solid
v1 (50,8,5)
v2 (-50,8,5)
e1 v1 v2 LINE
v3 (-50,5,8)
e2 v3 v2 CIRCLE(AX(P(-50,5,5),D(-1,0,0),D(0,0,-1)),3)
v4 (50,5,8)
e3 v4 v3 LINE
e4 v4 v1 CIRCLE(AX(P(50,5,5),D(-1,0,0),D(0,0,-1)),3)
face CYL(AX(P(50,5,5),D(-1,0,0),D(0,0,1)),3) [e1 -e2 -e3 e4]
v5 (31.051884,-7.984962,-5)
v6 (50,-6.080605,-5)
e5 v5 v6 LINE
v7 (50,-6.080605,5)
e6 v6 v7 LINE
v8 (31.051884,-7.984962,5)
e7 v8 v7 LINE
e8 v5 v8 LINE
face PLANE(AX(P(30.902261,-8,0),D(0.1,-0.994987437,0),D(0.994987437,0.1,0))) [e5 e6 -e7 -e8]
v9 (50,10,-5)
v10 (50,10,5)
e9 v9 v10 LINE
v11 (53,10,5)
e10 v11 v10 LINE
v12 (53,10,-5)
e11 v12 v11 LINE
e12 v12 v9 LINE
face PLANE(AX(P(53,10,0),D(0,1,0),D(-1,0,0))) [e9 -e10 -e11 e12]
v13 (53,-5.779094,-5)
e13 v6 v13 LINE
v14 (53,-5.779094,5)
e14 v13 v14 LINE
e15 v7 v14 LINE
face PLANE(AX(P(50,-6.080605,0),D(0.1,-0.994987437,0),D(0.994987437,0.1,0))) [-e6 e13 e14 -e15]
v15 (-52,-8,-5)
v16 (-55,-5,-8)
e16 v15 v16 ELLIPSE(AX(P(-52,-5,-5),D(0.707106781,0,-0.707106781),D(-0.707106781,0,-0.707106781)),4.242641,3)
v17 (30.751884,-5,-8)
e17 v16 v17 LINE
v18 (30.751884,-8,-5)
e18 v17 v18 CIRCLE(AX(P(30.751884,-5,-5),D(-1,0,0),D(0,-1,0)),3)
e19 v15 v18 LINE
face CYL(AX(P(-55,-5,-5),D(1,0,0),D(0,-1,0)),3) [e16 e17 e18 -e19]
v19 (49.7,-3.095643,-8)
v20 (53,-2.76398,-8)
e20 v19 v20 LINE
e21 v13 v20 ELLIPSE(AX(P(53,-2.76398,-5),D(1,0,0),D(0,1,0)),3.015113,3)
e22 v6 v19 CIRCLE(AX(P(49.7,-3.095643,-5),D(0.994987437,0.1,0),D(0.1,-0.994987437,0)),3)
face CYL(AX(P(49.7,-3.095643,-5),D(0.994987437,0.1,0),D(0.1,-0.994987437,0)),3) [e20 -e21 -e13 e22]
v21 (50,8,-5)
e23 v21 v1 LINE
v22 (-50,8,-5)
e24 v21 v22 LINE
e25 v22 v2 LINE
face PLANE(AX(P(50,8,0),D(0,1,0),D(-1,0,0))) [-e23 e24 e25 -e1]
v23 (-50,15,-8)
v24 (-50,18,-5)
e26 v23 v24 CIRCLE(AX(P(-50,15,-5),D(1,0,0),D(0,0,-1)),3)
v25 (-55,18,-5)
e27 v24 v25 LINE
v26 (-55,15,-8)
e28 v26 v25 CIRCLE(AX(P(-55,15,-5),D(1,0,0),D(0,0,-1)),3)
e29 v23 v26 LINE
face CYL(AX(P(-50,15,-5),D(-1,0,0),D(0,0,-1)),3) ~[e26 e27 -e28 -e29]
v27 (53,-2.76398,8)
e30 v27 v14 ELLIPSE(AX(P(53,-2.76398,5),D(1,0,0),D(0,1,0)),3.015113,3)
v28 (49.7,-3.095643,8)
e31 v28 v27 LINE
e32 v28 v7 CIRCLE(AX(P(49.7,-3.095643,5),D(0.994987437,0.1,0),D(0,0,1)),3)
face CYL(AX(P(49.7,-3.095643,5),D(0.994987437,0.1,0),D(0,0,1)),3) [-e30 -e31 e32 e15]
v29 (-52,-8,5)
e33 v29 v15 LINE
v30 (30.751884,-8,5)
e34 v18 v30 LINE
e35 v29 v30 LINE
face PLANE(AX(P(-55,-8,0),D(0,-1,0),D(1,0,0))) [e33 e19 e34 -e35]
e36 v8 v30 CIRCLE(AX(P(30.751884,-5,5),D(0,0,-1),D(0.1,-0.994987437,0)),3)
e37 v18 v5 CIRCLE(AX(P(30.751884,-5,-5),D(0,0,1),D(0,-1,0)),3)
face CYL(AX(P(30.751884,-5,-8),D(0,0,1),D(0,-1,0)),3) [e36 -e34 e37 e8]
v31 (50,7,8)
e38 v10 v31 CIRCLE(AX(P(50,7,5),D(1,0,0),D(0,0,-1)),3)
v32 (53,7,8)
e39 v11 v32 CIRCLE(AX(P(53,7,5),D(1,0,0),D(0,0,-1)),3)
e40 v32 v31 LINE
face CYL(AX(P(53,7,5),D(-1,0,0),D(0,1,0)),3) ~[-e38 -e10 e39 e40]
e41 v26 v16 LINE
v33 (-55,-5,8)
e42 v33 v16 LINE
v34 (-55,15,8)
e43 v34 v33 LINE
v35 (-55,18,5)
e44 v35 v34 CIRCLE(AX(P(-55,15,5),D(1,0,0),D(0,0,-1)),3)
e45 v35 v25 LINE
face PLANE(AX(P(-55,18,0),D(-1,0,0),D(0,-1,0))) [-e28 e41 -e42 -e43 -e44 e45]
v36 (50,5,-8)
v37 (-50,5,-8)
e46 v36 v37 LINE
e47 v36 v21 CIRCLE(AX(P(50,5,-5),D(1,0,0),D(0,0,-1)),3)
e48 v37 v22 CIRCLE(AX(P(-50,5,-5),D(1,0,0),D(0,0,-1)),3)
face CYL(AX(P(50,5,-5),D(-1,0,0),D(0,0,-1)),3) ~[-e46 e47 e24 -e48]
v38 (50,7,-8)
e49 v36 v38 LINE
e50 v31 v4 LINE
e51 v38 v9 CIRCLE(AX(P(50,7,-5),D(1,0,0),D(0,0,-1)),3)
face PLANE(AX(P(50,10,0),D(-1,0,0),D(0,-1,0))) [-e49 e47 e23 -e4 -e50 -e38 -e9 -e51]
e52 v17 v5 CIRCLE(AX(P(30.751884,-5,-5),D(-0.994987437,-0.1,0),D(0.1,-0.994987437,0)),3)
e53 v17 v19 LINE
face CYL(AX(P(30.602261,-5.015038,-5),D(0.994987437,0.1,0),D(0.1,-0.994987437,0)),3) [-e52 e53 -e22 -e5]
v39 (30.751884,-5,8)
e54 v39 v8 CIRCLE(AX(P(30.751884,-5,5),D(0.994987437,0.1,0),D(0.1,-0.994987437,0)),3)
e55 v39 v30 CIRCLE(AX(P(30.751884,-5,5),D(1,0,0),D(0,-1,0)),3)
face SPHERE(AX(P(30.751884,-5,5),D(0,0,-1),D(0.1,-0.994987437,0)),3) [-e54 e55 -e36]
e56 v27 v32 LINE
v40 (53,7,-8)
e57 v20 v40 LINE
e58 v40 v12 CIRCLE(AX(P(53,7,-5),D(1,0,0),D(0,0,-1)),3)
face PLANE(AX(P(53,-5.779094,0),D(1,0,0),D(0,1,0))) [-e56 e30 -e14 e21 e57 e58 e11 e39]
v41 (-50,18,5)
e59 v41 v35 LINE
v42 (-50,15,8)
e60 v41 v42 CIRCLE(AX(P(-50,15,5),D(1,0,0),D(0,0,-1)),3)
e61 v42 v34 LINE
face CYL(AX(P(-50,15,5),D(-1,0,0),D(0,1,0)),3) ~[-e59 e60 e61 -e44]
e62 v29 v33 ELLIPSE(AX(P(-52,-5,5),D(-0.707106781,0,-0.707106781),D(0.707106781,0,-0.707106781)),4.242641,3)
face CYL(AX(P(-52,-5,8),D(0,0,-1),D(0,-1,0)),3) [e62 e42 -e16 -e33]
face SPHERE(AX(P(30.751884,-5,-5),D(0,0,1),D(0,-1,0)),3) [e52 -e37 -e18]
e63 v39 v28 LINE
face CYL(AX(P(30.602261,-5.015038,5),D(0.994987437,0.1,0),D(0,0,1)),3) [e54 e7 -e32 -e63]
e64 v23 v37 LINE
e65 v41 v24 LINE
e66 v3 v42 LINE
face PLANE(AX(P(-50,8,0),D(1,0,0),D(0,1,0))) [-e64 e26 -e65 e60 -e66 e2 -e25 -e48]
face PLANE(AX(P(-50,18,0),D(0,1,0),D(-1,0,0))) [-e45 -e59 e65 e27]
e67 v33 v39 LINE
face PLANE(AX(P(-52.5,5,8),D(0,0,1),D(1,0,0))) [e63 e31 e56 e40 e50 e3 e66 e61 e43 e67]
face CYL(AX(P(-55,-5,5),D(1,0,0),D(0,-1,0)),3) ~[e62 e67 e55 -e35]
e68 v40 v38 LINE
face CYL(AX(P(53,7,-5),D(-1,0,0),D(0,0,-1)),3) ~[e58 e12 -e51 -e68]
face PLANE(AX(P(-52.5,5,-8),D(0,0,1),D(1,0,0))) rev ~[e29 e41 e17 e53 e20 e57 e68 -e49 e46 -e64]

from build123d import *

# Parameters (mm, degrees)
F2_DEPTH      = 8
F2_DEPTH_BACK = 8
F3_R          = 3


# Not quite as in the source:
# - two fillets or chamfers of one size are made in one step


with BuildPart() as f2:
    # F1 (on Top) → F2 (new body, two sides)
    with BuildSketch(Plane.XY) as f2_sk:
        Polygon((-55, -8), (-50, -8), (-50, 8), (-50, 18), (-55, 18), align=None)
        Polygon((-50, -8), (30.9022613208, -8), (50, -6.0806050441), (50, 8), (-50, 8), align=None)
        Polygon((50, 8), (50, -6.0806050441), (53, -5.7790936996), (53, 10), (50, 10), align=None)
    extrude(amount=F2_DEPTH)
    extrude(f2_sk.sketch, amount=-F2_DEPTH_BACK)

    # F3 (call 1 of 7: OpenCascade refuses the feature's edges together)
    f3_edges = [f2.edges().sort_by_distance(p)[0] for p in [
        (-12.048869, -8, 8),
        (-55, -8, 0),
        (30.902261, -8, 0),
        (-12.048869, -8, -8),
        (41.951131, -6.889547, 8),
        (41.951131, -6.889547, -8),
    ]]
    fillet(f3_edges, radius=F3_R)

    # F3#2 (call 2 of 7)
    f3_2_edges = [f2.edges().sort_by_distance(p)[0] for p in [
        (-52.5, 18, -8),
    ]]
    fillet(f3_2_edges, radius=F3_R)

    # F3#3 (call 3 of 7)
    f3_3_edges = [f2.edges().sort_by_distance(p)[0] for p in [
        (-52.5, 18, 8),
    ]]
    fillet(f3_3_edges, radius=F3_R)

    # F3#4 (call 4 of 7)
    f3_4_edges = [f2.edges().sort_by_distance(p)[0] for p in [
        (0, 8, 8),
    ]]
    fillet(f3_4_edges, radius=F3_R)

    # F3#5 (call 5 of 7)
    f3_5_edges = [f2.edges().sort_by_distance(p)[0] for p in [
        (0, 8, -8),
    ]]
    fillet(f3_5_edges, radius=F3_R)

    # F3#6 (call 6 of 7)
    f3_6_edges = [f2.edges().sort_by_distance(p)[0] for p in [
        (51.5, 10, -8),
    ]]
    fillet(f3_6_edges, radius=F3_R)

    # F3#7 (call 7 of 7)
    f3_7_edges = [f2.edges().sort_by_distance(p)[0] for p in [
        (51.5, 10, 8),
    ]]
    fillet(f3_7_edges, radius=F3_R)


solid = f2.part
